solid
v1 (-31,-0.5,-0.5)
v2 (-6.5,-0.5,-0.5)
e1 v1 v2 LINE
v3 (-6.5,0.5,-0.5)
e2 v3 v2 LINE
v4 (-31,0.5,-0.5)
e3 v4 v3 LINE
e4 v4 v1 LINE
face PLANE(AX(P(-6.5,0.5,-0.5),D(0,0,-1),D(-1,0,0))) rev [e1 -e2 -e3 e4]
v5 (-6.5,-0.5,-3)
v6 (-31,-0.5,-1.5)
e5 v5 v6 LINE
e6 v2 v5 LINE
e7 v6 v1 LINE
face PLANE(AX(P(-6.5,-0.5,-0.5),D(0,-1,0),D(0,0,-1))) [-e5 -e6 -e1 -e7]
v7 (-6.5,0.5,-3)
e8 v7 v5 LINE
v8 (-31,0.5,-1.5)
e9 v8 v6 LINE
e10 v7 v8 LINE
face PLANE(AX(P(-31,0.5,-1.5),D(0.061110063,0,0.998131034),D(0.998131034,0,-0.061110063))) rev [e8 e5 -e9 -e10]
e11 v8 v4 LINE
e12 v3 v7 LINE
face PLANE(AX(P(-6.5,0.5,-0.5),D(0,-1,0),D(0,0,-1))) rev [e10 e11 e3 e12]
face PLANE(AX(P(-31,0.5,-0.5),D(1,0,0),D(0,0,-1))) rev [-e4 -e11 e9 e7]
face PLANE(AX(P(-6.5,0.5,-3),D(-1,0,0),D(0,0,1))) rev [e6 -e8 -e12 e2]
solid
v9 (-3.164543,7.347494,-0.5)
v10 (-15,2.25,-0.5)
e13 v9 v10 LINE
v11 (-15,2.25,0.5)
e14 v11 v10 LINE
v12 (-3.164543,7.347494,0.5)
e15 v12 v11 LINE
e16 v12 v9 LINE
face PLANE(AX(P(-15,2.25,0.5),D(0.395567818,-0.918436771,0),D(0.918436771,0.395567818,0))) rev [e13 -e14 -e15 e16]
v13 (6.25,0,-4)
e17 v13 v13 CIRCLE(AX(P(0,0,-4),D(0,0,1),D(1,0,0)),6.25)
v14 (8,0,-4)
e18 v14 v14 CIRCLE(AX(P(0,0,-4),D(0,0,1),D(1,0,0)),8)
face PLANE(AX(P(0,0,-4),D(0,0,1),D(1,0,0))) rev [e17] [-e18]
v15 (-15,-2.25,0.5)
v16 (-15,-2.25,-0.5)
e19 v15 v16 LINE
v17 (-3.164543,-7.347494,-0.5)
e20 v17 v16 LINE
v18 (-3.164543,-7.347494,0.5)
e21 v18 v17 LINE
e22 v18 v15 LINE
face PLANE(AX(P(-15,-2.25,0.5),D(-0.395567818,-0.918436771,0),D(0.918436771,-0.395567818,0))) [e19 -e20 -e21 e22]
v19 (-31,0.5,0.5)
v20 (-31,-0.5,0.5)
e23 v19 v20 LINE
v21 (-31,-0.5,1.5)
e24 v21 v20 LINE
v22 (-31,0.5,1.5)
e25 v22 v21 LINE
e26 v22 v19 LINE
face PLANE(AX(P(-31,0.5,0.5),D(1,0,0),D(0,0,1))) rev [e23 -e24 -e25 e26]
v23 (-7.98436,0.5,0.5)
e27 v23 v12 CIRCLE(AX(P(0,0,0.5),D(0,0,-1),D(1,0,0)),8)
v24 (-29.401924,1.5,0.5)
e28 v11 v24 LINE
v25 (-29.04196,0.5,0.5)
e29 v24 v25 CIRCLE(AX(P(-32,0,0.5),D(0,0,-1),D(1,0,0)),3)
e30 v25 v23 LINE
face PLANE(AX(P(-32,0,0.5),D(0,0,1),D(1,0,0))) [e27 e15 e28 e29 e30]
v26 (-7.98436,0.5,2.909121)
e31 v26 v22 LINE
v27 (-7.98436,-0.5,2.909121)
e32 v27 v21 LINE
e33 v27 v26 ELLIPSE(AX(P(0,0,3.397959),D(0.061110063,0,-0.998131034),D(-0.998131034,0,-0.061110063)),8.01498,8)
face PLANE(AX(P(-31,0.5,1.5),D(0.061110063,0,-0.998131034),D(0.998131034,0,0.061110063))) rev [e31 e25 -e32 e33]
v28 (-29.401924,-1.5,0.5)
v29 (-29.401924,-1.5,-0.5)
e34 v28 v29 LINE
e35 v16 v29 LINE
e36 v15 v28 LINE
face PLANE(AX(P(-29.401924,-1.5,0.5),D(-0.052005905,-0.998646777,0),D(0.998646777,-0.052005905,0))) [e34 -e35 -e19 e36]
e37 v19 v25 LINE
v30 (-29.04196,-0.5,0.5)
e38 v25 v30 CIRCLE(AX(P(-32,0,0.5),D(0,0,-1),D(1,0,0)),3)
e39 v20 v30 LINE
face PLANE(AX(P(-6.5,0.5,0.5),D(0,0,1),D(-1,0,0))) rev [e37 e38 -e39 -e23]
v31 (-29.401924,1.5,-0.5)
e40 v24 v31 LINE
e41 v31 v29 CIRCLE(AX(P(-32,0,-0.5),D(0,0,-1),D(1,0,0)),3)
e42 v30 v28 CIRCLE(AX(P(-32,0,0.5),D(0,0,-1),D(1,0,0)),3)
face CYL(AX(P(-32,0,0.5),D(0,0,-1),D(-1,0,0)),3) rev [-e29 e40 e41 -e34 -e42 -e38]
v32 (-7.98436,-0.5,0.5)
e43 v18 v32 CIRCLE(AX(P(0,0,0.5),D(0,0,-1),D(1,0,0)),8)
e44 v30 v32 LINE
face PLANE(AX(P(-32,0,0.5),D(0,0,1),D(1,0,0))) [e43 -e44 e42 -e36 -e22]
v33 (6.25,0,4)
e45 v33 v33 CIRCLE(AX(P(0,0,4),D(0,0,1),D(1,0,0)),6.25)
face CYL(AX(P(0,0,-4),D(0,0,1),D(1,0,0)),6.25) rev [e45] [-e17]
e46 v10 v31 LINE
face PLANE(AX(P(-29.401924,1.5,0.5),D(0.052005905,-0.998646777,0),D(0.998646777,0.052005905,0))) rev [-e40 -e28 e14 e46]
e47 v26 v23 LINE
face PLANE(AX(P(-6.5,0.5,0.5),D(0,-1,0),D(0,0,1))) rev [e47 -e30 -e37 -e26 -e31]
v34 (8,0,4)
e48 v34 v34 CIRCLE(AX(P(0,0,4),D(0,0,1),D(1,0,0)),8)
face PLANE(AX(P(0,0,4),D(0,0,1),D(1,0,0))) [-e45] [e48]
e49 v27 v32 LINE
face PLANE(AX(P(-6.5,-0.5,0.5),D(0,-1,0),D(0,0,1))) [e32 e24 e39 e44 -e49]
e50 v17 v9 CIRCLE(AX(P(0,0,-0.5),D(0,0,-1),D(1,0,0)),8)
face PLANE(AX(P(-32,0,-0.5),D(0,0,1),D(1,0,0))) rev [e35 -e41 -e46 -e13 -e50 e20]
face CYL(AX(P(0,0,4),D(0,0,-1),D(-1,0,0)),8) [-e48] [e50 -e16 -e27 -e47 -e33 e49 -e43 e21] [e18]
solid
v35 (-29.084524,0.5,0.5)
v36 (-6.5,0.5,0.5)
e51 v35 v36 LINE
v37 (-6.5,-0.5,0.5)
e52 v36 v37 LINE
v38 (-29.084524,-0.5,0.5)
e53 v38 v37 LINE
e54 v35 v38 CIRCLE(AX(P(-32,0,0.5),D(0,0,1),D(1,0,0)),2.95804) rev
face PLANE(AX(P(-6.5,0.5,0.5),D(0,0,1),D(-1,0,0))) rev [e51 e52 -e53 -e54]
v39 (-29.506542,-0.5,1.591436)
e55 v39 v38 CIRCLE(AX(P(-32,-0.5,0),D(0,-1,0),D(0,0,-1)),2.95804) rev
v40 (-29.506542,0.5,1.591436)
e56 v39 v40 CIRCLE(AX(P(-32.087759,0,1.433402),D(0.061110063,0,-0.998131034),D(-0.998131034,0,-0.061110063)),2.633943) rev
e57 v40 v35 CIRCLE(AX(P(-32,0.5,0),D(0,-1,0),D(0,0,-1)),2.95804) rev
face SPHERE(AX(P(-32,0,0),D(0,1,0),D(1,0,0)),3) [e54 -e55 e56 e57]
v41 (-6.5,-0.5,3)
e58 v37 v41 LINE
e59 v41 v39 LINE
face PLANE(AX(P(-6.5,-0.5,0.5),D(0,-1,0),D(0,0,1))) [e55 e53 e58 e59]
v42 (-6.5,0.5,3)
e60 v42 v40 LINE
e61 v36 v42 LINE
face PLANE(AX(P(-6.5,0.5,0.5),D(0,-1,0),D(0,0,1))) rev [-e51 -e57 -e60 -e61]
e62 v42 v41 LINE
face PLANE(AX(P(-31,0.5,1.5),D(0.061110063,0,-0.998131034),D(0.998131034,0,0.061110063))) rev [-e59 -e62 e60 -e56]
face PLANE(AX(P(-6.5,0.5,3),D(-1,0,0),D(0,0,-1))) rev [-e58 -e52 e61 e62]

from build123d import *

# Parameters (mm, degrees)
ESQUISSE1_R             = 8
EXTRUSION1_DEPTH        = 4
ESQUISSE2_R             = 6.25
ENL_V_MAT_EXTRU_1_DEPTH = 14.856406461
EXTRUSION2_DEPTH        = 0.5
EXTRUSION5_DEPTH        = 0.5
SYM_TRIE4_START         = -0.5
SYM_TRIE4_DEPTH         = 1
SYM_TRIE4_2_DEPTH       = 1


with BuildPart() as part:
    # Esquisse1 → Extrusion1 (new, symmetric)
    with BuildSketch(Plane.XY):
        Circle(ESQUISSE1_R)
    extrude(amount=EXTRUSION1_DEPTH, both=True)

    # Esquisse2 → Enlèv. mat.-Extru.1 (cut, through all)
    with BuildSketch(Plane.XY.offset(4)):
        Circle(ESQUISSE2_R)
    extrude(amount=-ENL_V_MAT_EXTRU_1_DEPTH, mode=Mode.SUBTRACT)

    # Esquisse4 → Extrusion2 (add, symmetric)
    with BuildSketch(Plane.XY):
        with BuildLine():
            Line((-29, 0), (-8, 0))
            ThreePointArc((-8, 0), (-6.682676871, 4.397934723), (-3.164542542, 7.347494165))
            Line((-3.164542542, 7.347494165), (-15, 2.25))
            Line((-15, 2.25), (-29.401923789, 1.5))
            ThreePointArc((-29.401923789, 1.5), (-29.102222521, 0.776457135), (-29, 0))
        make_face()
    extrusion2 = extrude(amount=EXTRUSION2_DEPTH, both=True)

    # Symétrie1: Extrusion2 across plane
    add(extrusion2.mirror(Plane.ZX))

    # Sym_trie4 2 outline → Sym_trie4 2 (add)
    with BuildSketch(Plane(origin=(0, 0, 0), x_dir=(1, 0, 0), z_dir=(0, 1, 0)).offset(SYM_TRIE4_START)):
        Polygon((-31, -0.5), (-31, -1.5), (-7.984359711, -2.909120834), (-7.984359711, -0.5), align=None)
    extrude(amount=SYM_TRIE4_2_DEPTH)


with BuildPart() as body_2:
    # Esquisse3 → Révolution1 (revolve)
    with BuildSketch(Plane.XY):
        with BuildLine():
            Line((-32, 3), (-32, -3))
            ThreePointArc((-32, -3), (-35, 0), (-32, 3))
        make_face()
    revolve(axis=Axis((-32, 3, 0), (0, -1, 0)))

    # Symétrie4: read off the stored shape, not the designer's step
    # Symétrie4 outline → Symétrie4 (add)
    with BuildSketch(Plane(origin=(0, 0, 0), x_dir=(1, 0, 0), z_dir=(0, 1, 0)).offset(SYM_TRIE4_START)):
        Polygon((-6.5, -3), (-6.5, -0.5), (-30, -0.5), (-30, -1.56122449), (-29.506542384, -1.591436181), align=None)
    extrude(amount=SYM_TRIE4_DEPTH)


with BuildPart() as body_3:
    # Esquisse7 → Extrusion5 (new, symmetric)
    with BuildSketch(Plane(origin=(0, 0, 0), x_dir=(1, 0, 0), z_dir=(0, 1, 0))):
        Polygon((-31, 1.5), (-6.5, 3), (-6.5, 0.5), (-15, 0.5), (-31, 0.5), align=None)
    extrude(amount=EXTRUSION5_DEPTH, both=True)


solid = Compound([part.part, body_2.part, body_3.part])
